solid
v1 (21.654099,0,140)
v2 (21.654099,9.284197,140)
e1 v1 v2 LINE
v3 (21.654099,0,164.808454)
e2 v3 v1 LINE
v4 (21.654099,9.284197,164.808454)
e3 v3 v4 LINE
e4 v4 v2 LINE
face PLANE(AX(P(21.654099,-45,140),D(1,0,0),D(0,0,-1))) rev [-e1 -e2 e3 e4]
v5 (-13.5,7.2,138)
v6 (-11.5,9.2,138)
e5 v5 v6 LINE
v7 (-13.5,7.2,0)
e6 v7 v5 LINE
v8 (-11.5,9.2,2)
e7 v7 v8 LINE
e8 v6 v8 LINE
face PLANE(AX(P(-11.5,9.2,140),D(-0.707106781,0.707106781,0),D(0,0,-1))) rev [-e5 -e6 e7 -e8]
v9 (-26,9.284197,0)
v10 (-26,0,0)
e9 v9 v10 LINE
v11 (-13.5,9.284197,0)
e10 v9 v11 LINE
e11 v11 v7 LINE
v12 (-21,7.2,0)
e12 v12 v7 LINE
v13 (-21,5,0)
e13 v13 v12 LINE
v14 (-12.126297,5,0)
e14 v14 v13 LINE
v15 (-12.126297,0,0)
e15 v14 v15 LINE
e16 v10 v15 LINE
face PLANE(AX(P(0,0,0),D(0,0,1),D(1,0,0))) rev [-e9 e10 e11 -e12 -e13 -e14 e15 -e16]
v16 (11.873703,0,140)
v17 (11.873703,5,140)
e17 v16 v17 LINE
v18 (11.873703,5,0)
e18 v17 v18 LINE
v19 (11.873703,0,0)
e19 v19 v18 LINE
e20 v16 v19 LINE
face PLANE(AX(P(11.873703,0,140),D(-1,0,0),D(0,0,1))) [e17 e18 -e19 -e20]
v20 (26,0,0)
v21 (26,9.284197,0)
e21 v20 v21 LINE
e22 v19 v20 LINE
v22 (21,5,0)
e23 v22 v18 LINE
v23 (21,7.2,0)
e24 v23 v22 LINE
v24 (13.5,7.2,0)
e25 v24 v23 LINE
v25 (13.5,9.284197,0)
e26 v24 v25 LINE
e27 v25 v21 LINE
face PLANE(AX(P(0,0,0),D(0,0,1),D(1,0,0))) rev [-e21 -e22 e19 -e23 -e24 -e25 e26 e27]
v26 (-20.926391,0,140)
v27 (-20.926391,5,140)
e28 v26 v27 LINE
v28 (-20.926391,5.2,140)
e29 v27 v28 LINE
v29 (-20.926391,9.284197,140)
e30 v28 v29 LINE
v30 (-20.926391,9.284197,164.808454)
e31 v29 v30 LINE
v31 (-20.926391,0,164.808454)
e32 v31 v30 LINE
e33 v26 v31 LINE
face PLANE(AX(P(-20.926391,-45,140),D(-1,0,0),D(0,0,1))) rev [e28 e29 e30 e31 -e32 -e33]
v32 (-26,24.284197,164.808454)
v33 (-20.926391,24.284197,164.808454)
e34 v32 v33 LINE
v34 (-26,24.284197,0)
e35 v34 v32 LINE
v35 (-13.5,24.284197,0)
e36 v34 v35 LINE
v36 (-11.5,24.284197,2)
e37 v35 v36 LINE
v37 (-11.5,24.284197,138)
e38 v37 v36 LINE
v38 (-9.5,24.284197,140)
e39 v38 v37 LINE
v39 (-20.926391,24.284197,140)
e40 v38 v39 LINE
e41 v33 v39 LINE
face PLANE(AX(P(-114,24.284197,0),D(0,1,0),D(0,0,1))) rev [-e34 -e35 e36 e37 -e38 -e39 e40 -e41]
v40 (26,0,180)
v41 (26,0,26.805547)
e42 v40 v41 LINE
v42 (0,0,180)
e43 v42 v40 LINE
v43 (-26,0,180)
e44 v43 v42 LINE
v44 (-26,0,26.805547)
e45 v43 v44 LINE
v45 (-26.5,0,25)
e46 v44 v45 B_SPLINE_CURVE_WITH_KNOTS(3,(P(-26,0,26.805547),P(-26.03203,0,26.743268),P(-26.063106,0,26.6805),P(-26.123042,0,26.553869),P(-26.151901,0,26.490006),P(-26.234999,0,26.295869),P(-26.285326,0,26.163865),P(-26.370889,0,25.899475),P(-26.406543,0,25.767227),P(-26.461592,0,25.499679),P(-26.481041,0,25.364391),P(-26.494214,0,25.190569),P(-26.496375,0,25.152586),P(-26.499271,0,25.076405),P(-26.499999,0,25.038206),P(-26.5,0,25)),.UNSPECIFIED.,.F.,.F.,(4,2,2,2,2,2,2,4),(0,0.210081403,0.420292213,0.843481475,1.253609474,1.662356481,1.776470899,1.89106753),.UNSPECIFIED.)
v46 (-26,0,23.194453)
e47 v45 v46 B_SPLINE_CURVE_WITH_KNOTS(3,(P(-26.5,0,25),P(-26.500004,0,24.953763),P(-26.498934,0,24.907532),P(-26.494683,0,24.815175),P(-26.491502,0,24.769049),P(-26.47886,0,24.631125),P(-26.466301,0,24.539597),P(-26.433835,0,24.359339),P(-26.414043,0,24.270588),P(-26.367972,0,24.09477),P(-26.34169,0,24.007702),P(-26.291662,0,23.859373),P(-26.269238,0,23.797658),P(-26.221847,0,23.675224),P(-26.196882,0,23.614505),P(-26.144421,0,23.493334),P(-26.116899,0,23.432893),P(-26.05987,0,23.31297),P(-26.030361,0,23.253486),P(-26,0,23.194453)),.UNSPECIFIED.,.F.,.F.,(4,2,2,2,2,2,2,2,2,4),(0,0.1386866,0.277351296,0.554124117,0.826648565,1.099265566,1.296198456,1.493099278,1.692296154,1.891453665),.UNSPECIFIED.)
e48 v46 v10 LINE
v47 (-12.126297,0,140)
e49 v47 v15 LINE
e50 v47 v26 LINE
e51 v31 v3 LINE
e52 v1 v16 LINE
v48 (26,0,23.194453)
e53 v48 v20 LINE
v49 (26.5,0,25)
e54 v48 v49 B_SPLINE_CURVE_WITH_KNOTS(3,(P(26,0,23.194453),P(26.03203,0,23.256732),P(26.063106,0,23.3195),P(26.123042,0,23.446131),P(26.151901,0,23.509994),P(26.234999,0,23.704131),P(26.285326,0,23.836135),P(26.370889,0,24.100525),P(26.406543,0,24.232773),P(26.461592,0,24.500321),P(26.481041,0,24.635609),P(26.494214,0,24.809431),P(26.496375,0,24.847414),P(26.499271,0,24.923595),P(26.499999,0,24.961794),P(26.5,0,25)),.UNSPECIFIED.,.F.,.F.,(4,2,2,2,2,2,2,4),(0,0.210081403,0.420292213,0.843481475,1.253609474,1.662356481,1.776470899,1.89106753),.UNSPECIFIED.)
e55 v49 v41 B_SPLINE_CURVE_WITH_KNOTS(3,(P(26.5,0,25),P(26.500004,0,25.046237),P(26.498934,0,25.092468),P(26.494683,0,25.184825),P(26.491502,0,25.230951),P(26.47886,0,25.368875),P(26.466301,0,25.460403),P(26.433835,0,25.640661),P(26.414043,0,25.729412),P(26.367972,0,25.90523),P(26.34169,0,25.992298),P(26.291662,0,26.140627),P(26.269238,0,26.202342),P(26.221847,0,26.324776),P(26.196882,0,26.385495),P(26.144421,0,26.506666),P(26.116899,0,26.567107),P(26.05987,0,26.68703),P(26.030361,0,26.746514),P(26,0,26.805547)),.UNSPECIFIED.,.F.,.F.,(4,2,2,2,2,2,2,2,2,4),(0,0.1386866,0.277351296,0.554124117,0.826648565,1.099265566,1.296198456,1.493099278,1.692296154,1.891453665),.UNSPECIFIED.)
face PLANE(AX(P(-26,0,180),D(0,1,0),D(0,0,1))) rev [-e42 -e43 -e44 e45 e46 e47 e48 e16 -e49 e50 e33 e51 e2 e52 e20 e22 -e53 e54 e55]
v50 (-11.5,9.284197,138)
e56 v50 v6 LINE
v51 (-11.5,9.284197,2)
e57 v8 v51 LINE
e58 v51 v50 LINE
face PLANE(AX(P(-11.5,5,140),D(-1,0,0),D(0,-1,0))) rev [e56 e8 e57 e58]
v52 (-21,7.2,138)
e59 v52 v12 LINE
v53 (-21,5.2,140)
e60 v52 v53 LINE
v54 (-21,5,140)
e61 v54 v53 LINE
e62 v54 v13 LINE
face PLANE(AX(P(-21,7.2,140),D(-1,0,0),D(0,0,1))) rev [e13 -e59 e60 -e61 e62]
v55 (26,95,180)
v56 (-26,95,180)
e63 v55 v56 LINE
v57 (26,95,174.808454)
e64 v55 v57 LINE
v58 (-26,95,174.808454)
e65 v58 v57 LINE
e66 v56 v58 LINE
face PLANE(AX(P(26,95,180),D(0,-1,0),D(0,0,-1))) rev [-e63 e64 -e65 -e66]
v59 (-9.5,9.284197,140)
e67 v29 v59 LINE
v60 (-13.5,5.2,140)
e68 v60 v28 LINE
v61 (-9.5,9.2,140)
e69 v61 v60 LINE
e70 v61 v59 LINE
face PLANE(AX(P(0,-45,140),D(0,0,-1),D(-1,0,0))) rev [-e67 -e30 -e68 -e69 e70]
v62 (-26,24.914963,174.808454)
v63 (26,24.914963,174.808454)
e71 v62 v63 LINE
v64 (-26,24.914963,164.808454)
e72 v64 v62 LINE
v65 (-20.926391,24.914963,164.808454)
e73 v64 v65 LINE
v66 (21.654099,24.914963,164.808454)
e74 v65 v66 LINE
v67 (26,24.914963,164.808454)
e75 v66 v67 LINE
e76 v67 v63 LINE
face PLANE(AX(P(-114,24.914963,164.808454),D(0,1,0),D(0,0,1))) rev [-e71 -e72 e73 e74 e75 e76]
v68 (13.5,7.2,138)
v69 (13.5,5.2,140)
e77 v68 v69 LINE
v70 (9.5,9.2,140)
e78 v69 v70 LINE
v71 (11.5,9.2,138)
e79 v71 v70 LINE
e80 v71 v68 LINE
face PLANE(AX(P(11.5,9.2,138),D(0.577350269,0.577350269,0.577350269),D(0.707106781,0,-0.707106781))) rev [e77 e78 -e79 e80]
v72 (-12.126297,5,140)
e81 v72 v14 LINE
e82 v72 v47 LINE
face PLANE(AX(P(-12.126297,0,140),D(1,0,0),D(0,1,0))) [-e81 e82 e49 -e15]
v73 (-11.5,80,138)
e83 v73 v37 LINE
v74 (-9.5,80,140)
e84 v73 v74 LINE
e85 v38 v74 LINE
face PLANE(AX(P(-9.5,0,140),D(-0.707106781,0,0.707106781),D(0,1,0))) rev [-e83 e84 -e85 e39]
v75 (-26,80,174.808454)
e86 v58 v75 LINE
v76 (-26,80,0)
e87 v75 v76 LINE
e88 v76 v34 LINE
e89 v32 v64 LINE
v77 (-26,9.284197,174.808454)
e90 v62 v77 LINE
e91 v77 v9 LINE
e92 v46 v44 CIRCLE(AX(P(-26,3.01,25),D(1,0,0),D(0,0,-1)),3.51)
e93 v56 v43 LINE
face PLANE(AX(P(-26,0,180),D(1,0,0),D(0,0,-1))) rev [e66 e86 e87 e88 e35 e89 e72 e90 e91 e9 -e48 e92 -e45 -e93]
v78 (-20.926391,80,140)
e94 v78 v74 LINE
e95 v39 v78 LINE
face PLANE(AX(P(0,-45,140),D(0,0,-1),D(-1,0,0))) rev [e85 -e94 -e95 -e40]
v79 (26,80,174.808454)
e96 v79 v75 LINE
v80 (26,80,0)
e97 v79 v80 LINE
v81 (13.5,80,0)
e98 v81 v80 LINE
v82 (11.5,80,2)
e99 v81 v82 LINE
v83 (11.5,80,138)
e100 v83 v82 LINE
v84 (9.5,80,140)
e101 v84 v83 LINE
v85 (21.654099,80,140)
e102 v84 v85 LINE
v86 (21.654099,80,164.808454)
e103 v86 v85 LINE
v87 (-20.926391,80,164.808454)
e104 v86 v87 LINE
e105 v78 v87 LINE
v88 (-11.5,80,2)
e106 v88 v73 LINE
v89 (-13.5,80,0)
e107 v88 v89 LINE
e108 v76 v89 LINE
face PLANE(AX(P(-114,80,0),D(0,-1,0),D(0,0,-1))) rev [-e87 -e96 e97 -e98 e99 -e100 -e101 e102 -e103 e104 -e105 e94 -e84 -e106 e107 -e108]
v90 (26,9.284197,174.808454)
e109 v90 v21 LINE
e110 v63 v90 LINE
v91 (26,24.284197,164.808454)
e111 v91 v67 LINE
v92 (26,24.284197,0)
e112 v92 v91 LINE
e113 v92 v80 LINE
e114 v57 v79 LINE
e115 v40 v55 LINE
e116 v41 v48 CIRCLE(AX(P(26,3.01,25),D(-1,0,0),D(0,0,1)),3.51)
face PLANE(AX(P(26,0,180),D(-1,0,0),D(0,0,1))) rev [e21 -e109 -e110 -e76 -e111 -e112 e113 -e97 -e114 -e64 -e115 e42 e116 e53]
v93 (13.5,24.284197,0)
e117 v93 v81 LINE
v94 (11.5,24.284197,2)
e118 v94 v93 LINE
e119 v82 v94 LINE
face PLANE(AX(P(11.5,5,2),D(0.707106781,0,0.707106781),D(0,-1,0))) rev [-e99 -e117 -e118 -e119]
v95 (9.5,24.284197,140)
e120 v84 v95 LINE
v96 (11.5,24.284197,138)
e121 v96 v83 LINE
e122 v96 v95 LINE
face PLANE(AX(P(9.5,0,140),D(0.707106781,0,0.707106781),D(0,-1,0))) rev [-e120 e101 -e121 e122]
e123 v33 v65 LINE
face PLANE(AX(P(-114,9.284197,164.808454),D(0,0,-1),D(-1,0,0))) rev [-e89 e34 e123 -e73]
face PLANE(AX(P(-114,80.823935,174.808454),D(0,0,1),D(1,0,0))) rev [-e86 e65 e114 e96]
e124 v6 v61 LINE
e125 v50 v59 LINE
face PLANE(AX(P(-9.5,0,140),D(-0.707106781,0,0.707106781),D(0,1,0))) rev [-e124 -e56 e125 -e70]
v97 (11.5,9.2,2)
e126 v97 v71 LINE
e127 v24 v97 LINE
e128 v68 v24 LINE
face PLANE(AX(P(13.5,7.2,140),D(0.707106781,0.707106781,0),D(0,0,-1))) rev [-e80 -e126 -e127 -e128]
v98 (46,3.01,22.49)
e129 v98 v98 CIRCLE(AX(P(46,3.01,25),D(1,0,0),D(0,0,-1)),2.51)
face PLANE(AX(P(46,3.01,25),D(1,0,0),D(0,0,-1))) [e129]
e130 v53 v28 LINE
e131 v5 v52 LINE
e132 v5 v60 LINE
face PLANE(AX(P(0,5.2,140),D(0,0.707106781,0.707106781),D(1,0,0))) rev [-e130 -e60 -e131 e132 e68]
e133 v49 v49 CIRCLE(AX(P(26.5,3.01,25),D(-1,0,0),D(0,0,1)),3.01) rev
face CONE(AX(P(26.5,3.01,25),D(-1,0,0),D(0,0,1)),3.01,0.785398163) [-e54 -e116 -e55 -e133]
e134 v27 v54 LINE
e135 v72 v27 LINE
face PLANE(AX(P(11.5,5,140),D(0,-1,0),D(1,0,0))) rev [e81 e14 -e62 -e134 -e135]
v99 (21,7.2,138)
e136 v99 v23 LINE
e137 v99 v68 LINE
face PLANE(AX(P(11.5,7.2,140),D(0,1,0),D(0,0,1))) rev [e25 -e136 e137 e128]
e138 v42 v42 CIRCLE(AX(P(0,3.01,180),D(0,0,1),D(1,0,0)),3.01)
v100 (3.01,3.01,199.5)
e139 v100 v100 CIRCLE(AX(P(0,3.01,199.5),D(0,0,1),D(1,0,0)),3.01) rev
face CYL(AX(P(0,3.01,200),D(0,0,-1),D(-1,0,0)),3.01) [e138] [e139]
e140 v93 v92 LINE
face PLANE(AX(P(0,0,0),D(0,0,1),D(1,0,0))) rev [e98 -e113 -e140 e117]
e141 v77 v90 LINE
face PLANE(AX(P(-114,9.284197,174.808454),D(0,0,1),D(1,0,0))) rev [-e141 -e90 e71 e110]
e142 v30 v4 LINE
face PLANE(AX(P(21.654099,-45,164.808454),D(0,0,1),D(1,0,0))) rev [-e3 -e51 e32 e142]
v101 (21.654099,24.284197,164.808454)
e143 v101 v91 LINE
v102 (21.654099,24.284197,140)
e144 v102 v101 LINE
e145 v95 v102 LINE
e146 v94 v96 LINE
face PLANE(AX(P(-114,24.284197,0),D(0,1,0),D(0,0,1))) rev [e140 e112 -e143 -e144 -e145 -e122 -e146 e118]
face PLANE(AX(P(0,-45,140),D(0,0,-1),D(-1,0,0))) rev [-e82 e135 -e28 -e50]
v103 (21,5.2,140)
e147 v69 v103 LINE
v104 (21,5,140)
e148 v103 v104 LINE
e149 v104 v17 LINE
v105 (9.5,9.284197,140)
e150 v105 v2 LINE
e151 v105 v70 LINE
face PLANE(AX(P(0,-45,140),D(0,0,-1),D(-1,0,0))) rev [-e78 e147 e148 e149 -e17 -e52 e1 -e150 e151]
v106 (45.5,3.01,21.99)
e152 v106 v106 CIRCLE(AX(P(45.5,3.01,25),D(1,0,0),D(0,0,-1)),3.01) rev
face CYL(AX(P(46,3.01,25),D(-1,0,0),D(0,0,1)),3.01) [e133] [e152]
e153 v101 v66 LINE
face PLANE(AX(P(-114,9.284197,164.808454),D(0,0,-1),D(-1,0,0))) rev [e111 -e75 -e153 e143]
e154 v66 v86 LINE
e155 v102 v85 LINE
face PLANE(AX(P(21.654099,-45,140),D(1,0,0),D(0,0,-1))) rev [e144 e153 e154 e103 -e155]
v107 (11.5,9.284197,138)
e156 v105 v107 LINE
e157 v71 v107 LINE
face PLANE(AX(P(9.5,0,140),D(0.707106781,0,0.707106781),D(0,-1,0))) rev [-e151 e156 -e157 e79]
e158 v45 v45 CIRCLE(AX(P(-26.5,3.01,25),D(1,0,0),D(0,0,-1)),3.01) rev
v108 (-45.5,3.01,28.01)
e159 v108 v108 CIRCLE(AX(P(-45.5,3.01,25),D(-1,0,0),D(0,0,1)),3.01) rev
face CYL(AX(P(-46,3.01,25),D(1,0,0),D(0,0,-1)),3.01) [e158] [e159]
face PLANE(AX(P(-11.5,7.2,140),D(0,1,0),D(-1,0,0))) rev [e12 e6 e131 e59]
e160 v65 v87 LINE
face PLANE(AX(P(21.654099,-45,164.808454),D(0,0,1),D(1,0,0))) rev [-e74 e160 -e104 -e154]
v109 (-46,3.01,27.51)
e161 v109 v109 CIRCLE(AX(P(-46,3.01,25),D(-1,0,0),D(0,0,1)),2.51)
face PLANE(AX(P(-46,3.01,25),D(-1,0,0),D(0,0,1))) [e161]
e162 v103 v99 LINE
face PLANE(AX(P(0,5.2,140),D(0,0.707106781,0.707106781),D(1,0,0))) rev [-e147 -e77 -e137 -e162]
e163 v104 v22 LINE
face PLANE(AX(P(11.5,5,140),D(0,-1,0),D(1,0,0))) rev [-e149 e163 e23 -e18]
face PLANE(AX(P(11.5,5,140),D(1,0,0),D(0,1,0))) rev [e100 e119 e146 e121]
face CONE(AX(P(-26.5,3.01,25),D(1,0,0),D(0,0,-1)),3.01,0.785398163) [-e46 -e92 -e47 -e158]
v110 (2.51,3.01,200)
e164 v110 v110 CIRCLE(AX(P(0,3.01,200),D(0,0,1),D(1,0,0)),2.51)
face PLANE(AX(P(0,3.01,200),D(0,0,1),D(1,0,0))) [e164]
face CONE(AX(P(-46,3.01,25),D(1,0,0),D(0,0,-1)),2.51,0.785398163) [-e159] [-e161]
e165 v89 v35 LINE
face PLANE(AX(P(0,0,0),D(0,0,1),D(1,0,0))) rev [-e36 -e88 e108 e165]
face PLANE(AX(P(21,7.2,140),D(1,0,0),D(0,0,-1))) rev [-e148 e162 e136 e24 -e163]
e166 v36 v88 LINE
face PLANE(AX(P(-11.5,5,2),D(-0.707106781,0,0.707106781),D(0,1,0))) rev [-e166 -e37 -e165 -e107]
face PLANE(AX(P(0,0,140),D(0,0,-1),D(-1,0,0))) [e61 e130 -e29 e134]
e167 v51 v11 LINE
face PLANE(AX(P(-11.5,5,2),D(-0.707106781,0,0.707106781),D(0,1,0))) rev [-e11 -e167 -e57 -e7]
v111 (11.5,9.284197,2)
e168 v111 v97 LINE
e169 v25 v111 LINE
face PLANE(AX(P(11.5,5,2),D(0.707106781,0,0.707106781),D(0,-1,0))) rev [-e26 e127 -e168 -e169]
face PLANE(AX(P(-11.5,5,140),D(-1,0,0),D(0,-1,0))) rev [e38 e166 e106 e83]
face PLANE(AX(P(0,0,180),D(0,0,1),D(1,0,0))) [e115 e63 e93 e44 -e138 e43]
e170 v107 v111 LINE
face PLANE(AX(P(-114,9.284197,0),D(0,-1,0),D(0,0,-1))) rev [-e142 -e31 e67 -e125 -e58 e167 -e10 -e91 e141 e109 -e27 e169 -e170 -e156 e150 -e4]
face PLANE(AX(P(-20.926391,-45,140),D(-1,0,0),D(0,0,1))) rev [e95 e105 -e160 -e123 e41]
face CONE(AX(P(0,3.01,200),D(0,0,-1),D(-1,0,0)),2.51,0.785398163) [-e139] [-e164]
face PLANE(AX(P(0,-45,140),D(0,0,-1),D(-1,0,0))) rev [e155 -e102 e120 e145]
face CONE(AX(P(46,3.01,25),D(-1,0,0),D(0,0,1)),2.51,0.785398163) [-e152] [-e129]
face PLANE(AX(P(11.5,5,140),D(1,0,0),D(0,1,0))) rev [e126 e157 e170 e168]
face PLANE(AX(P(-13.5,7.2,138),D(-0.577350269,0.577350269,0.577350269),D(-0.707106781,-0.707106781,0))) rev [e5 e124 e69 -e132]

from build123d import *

# Parameters (mm, degrees)
SKETCH_1_W           = 52
SKETCH_1_H           = 95
EXTRUDE_1_DEPTH      = 180
SKETCH_2_W           = 23
SKETCH_2_H           = 90
CUT_EXTRUDE_1_DEPTH  = 140
SKETCH_3_W           = 9.5
SKETCH_3_H           = 2.2
CUT_EXTRUDE_2_DEPTH  = 140
CHAMFER_1_SIZE       = 2
CUT_EXTRUDE_3_DEPTH  = 140
SKETCH_5_W           = 140
SKETCH_5_H           = 15
CUT_EXTRUDE_4_DEPTH  = 140
SKETCH_6_W           = 140
SKETCH_6_H           = 15
CUT_EXTRUDE_7_DEPTH  = 140
CUT_EXTRUDE_8_DEPTH  = 140
SKETCH_8_W           = 24.808453611
SKETCH_8_H           = 15
CUT_EXTRUDE_9_DEPTH  = 140
SKETCH_9_W           = 10
SKETCH_9_H           = 14.176065277
SKETCH_9_H_2         = 15.630765607
CUT_EXTRUDE_10_DEPTH = 140
SKETCH_10_W          = 52
SKETCH_10_H          = 0.823934723
CUT_EXTRUDE_11_DEPTH = 10
SKETCH_12_R          = 3.01
EXTRUDE_2_DEPTH      = 20
CHAMFER_3_SIZE       = 0.5
SKETCH_13_R          = 3.01
EXTRUDE_4_DEPTH      = 20
CHAMFER_4_SIZE       = 0.5
EXTRUDE_START        = 20
SKETCH_15_R          = 3.01
EXTRUDE_5_DEPTH      = 20
CHAMFER_5_SIZE       = 0.5


with BuildPart() as part:
    # 草图1 → 凸台-拉伸1 (new body)
    with BuildSketch(Plane.XY):
        with Locations((0, 47.5)):
            Rectangle(SKETCH_1_W, SKETCH_1_H)
    extrude(amount=EXTRUDE_1_DEPTH)

    # 草图2 → 切除-拉伸1 (cut)
    with BuildSketch(Plane(origin=(0, 0, 0), x_dir=(-1, 0, 0), z_dir=(0, 0, -1))):
        with Locations((0, 50)):
            Rectangle(SKETCH_2_W, SKETCH_2_H)
    extrude(amount=-CUT_EXTRUDE_1_DEPTH, mode=Mode.SUBTRACT)

    # 草图3 → 切除-拉伸2 (cut)
    with BuildSketch(Plane(origin=(0, 0, 0), x_dir=(-1, 0, 0), z_dir=(0, 0, -1))):
        with Locations((-16.25, 6.1)):
            Rectangle(SKETCH_3_W, SKETCH_3_H)
        with Locations((16.25, 6.1)):
            Rectangle(SKETCH_3_W, SKETCH_3_H)
    extrude(amount=-CUT_EXTRUDE_2_DEPTH, mode=Mode.SUBTRACT)

    # 倒角1
    chamfer_1_edges = [part.edges().sort_by_distance(p)[0] for p in [
        (11.5, 51.1, 140),
        (0, 95, 140),
        (11.5, 95, 70),
        (-11.5, 95, 70),
        (11.5, 51.1, 0),
        (-11.5, 51.1, 140),
        (-11.5, 51.1, 0),
        (11.5, 7.2, 70),
        (16.25, 7.2, 140),
        (-16.25, 7.2, 140),
        (-11.5, 7.2, 70),
    ]]
    chamfer(chamfer_1_edges, length=CHAMFER_1_SIZE)

    # 草图4 → 切除-拉伸3 (cut)
    with BuildSketch(Plane(origin=(0, 0, 0), x_dir=(-1, 0, 0), z_dir=(0, 0, -1))):
        Polygon((-0.565514489, 0), (0, 0), (12.126296858, 0), (12.126296858, 5), (-11.873703142, 5), (-11.873703142, 0), align=None)
    extrude(amount=-CUT_EXTRUDE_3_DEPTH, mode=Mode.SUBTRACT)

    # 草图5 → 切除-拉伸4 (cut)
    with BuildSketch(Plane(origin=(26, 0, 0), x_dir=(0, 0, -1), z_dir=(1, 0, 0))):
        with Locations((-70, 87.5)):
            Rectangle(SKETCH_5_W, SKETCH_5_H)
    extrude(amount=-CUT_EXTRUDE_4_DEPTH, mode=Mode.SUBTRACT)

    # 草图6 → 切除-拉伸7 (cut)
    with BuildSketch(Plane(origin=(26, 0, 0), x_dir=(0, 0, -1), z_dir=(1, 0, 0))):
        with Locations((-70, 16.784197303)):
            Rectangle(SKETCH_6_W, SKETCH_6_H)
    extrude(amount=-CUT_EXTRUDE_7_DEPTH, mode=Mode.SUBTRACT)

    # 草图7 → 切除-拉伸8 (cut)
    with BuildSketch(Plane(origin=(0, 95, 0), x_dir=(1, 0, 0), z_dir=(0, 1, 0))):
        Polygon((0, -140), (21.6540992, -140), (21.6540992, -164.808453611), (-20.3459008, -164.808453611), (-20.926391083, -164.808453611), (-20.926391083, -140), align=None)
    extrude(amount=-CUT_EXTRUDE_8_DEPTH, mode=Mode.SUBTRACT)

    # 草图8 → 切除-拉伸9 (cut)
    with BuildSketch(Plane(origin=(26, 0, 0), x_dir=(0, 0, -1), z_dir=(1, 0, 0))):
        with Locations((-152.404226806, 87.5)):
            Rectangle(SKETCH_8_W, SKETCH_8_H)
        with Locations((-152.404226806, 16.784197303)):
            Rectangle(SKETCH_8_W, SKETCH_8_H)
    extrude(amount=-CUT_EXTRUDE_9_DEPTH, mode=Mode.SUBTRACT)

    # 草图9 → 切除-拉伸10 (cut)
    with BuildSketch(Plane(origin=(26, 0, 0), x_dir=(0, 0, -1), z_dir=(1, 0, 0))):
        with Locations((-169.808453611, 87.911967362)):
            Rectangle(SKETCH_9_W, SKETCH_9_H)
        with Locations((-169.808453611, 17.099580106)):
            Rectangle(SKETCH_9_W, SKETCH_9_H_2)
    extrude(amount=-CUT_EXTRUDE_10_DEPTH, mode=Mode.SUBTRACT)

    # 草图10 → 切除-拉伸11 (cut)
    with BuildSketch(Plane(origin=(0, 0, 164.808453611), x_dir=(-1, 0, 0), z_dir=(0, 0, -1))):
        with Locations((0, 80.411967362)):
            Rectangle(SKETCH_10_W, SKETCH_10_H)
    extrude(amount=-CUT_EXTRUDE_11_DEPTH, mode=Mode.SUBTRACT)

    # 草图12 → 凸台-拉伸2 (add)
    with BuildSketch(Plane.XY.offset(180)):
        with Locations(Location((0, 3.01, 0), (0, 0, 270))):
            Circle(SKETCH_12_R)
    extrude(amount=EXTRUDE_2_DEPTH)

    # 倒角3
    chamfer_3_edges = [part.edges().sort_by_distance(p)[0] for p in [
        (0, 6.02, 200),
    ]]
    chamfer(chamfer_3_edges, length=CHAMFER_3_SIZE)

    # 草图13 → 凸台-拉伸4 (add)
    with BuildSketch(Plane(origin=(26, 0, 0), x_dir=(0, 0, -1), z_dir=(1, 0, 0))):
        with Locations(Location((-25, 3.01, 0), (0, 0, 270))):
            Circle(SKETCH_13_R)
    extrude(amount=EXTRUDE_4_DEPTH)

    # 倒角4
    # the kernel refuses this chamfer: 0.5 mm, written as the material it adds along each edge
    with BuildSketch(Plane(origin=(26, 3.01, 25), x_dir=(0, -1, 0), z_dir=(0, 0, 1))) as chamfer_4_piece_1_section:
        Polygon((3.01 + CHAMFER_4_SIZE, 0), (3.01, CHAMFER_4_SIZE), (3.01, 0), align=None)
    chamfer_4_piece_1 = revolve(axis=Axis((26, 3.01, 25), (1, 0, 0)), mode=Mode.PRIVATE)
    chamfer_4_piece_1 = split(chamfer_4_piece_1, bisect_by=Plane(origin=(26.240420809, 0, 25), z_dir=(0, 1, 0)), keep=Keep.TOP, mode=Mode.PRIVATE)
    add(chamfer_4_piece_1)
    # the kernel refuses this chamfer: 0.5 mm, written as the material it takes off along each edge
    with BuildSketch(Plane(origin=(46, 3.01, 25), x_dir=(0, -1, 0), z_dir=(0, 0, 1))) as chamfer_4_2_piece_1:
        Polygon((3.01, -CHAMFER_4_SIZE), (3.01 - CHAMFER_4_SIZE, 0), (3.01, 0), align=None)
    revolve(axis=Axis((46, 3.01, 25), (1, 0, 0)), mode=Mode.SUBTRACT)

    # 草图15 → 凸台-拉伸5 (add)
    with BuildSketch(Plane.ZY.offset(26).offset(EXTRUDE_START)):
        with Locations(Location((25, 3.01, 0), (0, 0, 270))):
            Circle(SKETCH_15_R)
    extrude(amount=-EXTRUDE_5_DEPTH)

    # 倒角5
    # the kernel refuses this chamfer: 0.5 mm, written as the material it adds along each edge
    with BuildSketch(Plane(origin=(-26, 3.01, 25), x_dir=(0, -1, 0), z_dir=(0, 0, -1))) as chamfer_5_piece_1_section:
        Polygon((3.01 + CHAMFER_5_SIZE, 0), (3.01, CHAMFER_5_SIZE), (3.01, 0), align=None)
    chamfer_5_piece_1 = revolve(axis=Axis((-26, 3.01, 25), (-1, 0, 0)), mode=Mode.PRIVATE)
    chamfer_5_piece_1 = split(chamfer_5_piece_1, bisect_by=Plane(origin=(-26.240420809, 0, 25), z_dir=(0, 1, 0)), keep=Keep.TOP, mode=Mode.PRIVATE)
    add(chamfer_5_piece_1)
    # the kernel refuses this chamfer: 0.5 mm, written as the material it takes off along each edge
    with BuildSketch(Plane(origin=(-46, 3.01, 25), x_dir=(0, -1, 0), z_dir=(0, 0, -1))) as chamfer_5_2_piece_1:
        Polygon((3.01, -CHAMFER_5_SIZE), (3.01 - CHAMFER_5_SIZE, 0), (3.01, 0), align=None)
    revolve(axis=Axis((-46, 3.01, 25), (-1, 0, 0)), mode=Mode.SUBTRACT)


solid = part.part
